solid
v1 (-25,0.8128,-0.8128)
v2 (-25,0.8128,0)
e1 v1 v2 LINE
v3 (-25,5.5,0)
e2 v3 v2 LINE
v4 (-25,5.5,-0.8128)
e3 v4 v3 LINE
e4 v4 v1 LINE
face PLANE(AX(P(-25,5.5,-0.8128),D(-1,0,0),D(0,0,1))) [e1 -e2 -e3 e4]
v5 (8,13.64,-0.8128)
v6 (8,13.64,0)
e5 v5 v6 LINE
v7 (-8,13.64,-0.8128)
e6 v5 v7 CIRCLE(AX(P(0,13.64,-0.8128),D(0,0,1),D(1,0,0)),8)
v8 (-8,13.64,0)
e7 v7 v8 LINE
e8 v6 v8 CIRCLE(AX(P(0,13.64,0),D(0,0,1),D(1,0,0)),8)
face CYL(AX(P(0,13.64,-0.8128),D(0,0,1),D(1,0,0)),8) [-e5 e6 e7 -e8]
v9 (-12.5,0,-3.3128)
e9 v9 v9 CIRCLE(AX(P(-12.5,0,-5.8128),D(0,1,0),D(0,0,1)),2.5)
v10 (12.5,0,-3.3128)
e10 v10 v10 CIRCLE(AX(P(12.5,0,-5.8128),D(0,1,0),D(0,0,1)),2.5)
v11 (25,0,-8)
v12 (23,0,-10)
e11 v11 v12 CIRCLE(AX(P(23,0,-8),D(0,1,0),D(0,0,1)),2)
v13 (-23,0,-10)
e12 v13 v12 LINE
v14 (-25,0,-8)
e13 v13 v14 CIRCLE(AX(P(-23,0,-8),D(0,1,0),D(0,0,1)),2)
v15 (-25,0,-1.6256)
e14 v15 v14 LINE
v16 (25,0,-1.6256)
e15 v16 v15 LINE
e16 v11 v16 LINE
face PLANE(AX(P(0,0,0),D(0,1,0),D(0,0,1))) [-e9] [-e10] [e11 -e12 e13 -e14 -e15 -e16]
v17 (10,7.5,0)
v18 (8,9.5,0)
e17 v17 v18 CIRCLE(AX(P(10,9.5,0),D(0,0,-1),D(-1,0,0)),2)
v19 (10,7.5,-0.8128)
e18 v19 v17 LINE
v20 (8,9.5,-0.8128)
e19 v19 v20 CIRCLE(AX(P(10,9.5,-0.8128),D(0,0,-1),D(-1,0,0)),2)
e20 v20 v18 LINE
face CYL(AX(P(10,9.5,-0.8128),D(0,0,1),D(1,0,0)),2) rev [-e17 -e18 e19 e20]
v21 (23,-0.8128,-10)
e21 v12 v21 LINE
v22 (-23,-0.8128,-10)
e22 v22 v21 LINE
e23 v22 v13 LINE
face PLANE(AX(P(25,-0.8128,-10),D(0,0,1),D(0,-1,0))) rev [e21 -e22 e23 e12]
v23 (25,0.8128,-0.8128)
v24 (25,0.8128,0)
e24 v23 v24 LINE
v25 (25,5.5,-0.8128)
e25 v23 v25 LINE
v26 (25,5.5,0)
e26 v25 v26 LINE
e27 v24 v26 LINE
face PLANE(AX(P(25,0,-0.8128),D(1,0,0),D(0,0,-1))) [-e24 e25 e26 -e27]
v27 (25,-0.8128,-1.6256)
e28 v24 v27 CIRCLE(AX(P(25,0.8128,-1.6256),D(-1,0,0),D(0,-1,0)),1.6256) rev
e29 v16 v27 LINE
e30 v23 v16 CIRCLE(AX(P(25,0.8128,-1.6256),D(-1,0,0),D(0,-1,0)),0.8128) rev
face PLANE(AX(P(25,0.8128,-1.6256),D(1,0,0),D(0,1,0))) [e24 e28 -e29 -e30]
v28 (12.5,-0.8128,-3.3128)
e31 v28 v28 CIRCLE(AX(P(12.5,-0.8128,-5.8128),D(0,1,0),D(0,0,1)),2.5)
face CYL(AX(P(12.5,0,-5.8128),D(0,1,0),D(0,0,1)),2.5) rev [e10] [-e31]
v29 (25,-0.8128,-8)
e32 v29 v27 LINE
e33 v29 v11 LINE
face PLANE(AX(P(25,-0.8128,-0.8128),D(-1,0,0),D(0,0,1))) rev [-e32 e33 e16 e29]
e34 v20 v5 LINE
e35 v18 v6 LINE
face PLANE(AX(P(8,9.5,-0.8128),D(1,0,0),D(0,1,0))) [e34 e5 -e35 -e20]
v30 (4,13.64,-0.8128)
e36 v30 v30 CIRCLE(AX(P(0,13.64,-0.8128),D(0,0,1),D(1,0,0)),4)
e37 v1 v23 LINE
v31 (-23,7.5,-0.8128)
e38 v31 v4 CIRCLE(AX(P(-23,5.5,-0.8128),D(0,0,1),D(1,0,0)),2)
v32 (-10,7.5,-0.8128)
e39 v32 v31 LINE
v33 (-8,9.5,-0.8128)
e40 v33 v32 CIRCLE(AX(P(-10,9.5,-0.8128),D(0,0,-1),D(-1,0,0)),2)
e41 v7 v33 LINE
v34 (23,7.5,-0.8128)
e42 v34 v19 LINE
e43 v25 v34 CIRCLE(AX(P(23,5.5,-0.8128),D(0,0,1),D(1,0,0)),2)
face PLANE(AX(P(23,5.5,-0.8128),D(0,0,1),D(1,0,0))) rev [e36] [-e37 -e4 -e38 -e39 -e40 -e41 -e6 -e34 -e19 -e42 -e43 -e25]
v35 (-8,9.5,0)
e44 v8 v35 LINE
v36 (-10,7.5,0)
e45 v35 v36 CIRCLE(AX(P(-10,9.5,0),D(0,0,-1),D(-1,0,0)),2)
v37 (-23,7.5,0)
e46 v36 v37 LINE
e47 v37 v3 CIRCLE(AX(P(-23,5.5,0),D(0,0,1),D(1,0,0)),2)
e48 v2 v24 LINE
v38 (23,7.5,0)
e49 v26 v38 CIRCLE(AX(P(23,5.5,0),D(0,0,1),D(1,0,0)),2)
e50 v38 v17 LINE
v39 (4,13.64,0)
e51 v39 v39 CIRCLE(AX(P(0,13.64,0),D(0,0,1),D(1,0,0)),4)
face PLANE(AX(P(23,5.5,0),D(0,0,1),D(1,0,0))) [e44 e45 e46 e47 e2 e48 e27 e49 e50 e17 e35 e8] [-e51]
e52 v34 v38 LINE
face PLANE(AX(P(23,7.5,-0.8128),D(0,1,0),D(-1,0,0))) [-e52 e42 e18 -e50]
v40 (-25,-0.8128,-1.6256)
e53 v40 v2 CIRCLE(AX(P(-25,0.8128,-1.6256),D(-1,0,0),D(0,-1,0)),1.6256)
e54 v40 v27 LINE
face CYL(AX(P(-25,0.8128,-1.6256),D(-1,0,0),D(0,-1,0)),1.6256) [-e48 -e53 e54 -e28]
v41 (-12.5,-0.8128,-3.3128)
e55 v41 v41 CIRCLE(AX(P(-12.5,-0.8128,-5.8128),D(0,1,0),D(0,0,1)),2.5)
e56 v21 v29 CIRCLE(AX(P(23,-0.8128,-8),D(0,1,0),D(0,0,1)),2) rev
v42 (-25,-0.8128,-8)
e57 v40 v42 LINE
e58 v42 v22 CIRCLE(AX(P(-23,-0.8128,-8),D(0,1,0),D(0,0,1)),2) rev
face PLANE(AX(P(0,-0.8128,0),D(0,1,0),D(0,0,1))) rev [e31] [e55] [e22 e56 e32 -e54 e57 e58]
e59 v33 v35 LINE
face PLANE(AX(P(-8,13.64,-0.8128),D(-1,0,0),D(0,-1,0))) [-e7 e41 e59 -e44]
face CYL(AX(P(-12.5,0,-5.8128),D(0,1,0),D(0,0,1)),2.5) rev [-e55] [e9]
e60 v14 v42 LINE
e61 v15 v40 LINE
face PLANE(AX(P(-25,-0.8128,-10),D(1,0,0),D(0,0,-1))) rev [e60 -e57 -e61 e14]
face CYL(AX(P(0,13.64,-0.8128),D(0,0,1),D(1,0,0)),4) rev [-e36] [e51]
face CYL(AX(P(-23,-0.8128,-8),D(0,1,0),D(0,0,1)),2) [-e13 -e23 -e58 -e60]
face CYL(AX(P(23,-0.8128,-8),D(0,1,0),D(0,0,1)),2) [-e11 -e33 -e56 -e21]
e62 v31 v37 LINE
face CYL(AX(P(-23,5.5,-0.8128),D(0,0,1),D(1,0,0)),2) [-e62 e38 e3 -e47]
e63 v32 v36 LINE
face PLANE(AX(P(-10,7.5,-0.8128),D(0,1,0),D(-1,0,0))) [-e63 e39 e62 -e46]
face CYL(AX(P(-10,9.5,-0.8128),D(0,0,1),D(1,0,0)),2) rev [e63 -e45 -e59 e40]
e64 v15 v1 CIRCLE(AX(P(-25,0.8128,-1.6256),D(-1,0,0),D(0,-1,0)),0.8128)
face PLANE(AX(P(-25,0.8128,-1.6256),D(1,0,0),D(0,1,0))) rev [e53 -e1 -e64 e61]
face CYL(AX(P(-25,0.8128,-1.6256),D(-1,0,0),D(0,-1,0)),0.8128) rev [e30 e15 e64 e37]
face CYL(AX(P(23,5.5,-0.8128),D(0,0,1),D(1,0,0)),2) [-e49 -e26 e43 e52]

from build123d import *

# Parameters (mm, degrees)
SKETCH1_R                    = 4
BASE_FLANGE1_DEPTH           = 0.8128
EDGE_FLANGE1_STRIP_W         = 4.8768
EDGE_FLANGE1_STRIP_H         = 0.8128
EDGE_FLANGE1_STRIP_CUT_DEPTH = 50
EDGE_FLANGE1_DEPTH           = 50
FILLET2_R                    = 2
F_5_0MM_DOWEL_HOLE1_D        = 5


# Sheet-metal steps are written as plain solids
with BuildPart() as part:
    # Sketch1 → Base-Flange1 (new body)
    with BuildSketch(Plane.XY):
        with BuildLine():
            Line((-25, 0), (25, 0))
            Line((25, 0), (25, 5.5))
            ThreePointArc((25, 5.5), (24.414213562, 6.914213562), (23, 7.5))
            Line((23, 7.5), (10, 7.5))
            ThreePointArc((10, 7.5), (8.585786438, 8.085786438), (8, 9.5))
            Line((8, 9.5), (8, 13.64))
            ThreePointArc((8, 13.64), (0, 21.64), (-8, 13.64))
            Line((-8, 13.64), (-8, 9.5))
            ThreePointArc((-8, 9.5), (-8.585786438, 8.085786438), (-10, 7.5))
            Line((-10, 7.5), (-23, 7.5))
            ThreePointArc((-23, 7.5), (-24.414213562, 6.914213562), (-25, 5.5))
            Line((-25, 5.5), (-25, 0))
        make_face()
        with Locations((0, 13.64)):
            Circle(SKETCH1_R, mode=Mode.SUBTRACT)
    extrude(amount=-BASE_FLANGE1_DEPTH)

    # Edge-Flange1 strip (across the edge) → Edge-Flange1 strip cut (cut)
    with BuildSketch(Plane(origin=(25, 0, -0.8128), x_dir=(0, 1, 0), z_dir=(-1, 0, 0))):
        with Locations((-1.6256, -0.4064)):
            Rectangle(EDGE_FLANGE1_STRIP_W, EDGE_FLANGE1_STRIP_H)
    extrude(amount=EDGE_FLANGE1_STRIP_CUT_DEPTH, mode=Mode.SUBTRACT)

    # Edge-Flange1 section (across the edge) → Edge-Flange1 (add)
    with BuildSketch(Plane(origin=(25, 0, -0.8128), x_dir=(0, 1, 0), z_dir=(-1, 0, 0))):
        with BuildLine():
            Line((-0.8128, 0.8128), (-0.8128, 9.1872))
            Line((-0.8128, 9.1872), (0, 9.1872))
            Line((0, 9.1872), (0, 0.8128))
            ThreePointArc((0, 0.8128), (0.238063608, 0.238063608), (0.8128, 0))
            Line((0.8128, 0), (0.8128, -0.8128))
            ThreePointArc((0.8128, -0.8128), (-0.336672783, -0.336672783), (-0.8128, 0.8128))
        make_face()
    extrude(amount=EDGE_FLANGE1_DEPTH)

    # Fillet2
    fillet2_edges = [part.edges().sort_by_distance(p)[0] for p in [
        (25, -0.4064, -10),
        (-25, -0.4064, -10),
    ]]
    fillet(fillet2_edges, radius=FILLET2_R)

    # Ø5.0mm Dowel Hole1 (through all)
    with Locations(Plane(origin=(0, 0, 0), x_dir=(1, 0, 0), z_dir=(0, 1, 0))):
        with Locations((-12.5, 5.8128), (12.5, 5.8128)):
            Hole(F_5_0MM_DOWEL_HOLE1_D / 2)


solid = part.part
